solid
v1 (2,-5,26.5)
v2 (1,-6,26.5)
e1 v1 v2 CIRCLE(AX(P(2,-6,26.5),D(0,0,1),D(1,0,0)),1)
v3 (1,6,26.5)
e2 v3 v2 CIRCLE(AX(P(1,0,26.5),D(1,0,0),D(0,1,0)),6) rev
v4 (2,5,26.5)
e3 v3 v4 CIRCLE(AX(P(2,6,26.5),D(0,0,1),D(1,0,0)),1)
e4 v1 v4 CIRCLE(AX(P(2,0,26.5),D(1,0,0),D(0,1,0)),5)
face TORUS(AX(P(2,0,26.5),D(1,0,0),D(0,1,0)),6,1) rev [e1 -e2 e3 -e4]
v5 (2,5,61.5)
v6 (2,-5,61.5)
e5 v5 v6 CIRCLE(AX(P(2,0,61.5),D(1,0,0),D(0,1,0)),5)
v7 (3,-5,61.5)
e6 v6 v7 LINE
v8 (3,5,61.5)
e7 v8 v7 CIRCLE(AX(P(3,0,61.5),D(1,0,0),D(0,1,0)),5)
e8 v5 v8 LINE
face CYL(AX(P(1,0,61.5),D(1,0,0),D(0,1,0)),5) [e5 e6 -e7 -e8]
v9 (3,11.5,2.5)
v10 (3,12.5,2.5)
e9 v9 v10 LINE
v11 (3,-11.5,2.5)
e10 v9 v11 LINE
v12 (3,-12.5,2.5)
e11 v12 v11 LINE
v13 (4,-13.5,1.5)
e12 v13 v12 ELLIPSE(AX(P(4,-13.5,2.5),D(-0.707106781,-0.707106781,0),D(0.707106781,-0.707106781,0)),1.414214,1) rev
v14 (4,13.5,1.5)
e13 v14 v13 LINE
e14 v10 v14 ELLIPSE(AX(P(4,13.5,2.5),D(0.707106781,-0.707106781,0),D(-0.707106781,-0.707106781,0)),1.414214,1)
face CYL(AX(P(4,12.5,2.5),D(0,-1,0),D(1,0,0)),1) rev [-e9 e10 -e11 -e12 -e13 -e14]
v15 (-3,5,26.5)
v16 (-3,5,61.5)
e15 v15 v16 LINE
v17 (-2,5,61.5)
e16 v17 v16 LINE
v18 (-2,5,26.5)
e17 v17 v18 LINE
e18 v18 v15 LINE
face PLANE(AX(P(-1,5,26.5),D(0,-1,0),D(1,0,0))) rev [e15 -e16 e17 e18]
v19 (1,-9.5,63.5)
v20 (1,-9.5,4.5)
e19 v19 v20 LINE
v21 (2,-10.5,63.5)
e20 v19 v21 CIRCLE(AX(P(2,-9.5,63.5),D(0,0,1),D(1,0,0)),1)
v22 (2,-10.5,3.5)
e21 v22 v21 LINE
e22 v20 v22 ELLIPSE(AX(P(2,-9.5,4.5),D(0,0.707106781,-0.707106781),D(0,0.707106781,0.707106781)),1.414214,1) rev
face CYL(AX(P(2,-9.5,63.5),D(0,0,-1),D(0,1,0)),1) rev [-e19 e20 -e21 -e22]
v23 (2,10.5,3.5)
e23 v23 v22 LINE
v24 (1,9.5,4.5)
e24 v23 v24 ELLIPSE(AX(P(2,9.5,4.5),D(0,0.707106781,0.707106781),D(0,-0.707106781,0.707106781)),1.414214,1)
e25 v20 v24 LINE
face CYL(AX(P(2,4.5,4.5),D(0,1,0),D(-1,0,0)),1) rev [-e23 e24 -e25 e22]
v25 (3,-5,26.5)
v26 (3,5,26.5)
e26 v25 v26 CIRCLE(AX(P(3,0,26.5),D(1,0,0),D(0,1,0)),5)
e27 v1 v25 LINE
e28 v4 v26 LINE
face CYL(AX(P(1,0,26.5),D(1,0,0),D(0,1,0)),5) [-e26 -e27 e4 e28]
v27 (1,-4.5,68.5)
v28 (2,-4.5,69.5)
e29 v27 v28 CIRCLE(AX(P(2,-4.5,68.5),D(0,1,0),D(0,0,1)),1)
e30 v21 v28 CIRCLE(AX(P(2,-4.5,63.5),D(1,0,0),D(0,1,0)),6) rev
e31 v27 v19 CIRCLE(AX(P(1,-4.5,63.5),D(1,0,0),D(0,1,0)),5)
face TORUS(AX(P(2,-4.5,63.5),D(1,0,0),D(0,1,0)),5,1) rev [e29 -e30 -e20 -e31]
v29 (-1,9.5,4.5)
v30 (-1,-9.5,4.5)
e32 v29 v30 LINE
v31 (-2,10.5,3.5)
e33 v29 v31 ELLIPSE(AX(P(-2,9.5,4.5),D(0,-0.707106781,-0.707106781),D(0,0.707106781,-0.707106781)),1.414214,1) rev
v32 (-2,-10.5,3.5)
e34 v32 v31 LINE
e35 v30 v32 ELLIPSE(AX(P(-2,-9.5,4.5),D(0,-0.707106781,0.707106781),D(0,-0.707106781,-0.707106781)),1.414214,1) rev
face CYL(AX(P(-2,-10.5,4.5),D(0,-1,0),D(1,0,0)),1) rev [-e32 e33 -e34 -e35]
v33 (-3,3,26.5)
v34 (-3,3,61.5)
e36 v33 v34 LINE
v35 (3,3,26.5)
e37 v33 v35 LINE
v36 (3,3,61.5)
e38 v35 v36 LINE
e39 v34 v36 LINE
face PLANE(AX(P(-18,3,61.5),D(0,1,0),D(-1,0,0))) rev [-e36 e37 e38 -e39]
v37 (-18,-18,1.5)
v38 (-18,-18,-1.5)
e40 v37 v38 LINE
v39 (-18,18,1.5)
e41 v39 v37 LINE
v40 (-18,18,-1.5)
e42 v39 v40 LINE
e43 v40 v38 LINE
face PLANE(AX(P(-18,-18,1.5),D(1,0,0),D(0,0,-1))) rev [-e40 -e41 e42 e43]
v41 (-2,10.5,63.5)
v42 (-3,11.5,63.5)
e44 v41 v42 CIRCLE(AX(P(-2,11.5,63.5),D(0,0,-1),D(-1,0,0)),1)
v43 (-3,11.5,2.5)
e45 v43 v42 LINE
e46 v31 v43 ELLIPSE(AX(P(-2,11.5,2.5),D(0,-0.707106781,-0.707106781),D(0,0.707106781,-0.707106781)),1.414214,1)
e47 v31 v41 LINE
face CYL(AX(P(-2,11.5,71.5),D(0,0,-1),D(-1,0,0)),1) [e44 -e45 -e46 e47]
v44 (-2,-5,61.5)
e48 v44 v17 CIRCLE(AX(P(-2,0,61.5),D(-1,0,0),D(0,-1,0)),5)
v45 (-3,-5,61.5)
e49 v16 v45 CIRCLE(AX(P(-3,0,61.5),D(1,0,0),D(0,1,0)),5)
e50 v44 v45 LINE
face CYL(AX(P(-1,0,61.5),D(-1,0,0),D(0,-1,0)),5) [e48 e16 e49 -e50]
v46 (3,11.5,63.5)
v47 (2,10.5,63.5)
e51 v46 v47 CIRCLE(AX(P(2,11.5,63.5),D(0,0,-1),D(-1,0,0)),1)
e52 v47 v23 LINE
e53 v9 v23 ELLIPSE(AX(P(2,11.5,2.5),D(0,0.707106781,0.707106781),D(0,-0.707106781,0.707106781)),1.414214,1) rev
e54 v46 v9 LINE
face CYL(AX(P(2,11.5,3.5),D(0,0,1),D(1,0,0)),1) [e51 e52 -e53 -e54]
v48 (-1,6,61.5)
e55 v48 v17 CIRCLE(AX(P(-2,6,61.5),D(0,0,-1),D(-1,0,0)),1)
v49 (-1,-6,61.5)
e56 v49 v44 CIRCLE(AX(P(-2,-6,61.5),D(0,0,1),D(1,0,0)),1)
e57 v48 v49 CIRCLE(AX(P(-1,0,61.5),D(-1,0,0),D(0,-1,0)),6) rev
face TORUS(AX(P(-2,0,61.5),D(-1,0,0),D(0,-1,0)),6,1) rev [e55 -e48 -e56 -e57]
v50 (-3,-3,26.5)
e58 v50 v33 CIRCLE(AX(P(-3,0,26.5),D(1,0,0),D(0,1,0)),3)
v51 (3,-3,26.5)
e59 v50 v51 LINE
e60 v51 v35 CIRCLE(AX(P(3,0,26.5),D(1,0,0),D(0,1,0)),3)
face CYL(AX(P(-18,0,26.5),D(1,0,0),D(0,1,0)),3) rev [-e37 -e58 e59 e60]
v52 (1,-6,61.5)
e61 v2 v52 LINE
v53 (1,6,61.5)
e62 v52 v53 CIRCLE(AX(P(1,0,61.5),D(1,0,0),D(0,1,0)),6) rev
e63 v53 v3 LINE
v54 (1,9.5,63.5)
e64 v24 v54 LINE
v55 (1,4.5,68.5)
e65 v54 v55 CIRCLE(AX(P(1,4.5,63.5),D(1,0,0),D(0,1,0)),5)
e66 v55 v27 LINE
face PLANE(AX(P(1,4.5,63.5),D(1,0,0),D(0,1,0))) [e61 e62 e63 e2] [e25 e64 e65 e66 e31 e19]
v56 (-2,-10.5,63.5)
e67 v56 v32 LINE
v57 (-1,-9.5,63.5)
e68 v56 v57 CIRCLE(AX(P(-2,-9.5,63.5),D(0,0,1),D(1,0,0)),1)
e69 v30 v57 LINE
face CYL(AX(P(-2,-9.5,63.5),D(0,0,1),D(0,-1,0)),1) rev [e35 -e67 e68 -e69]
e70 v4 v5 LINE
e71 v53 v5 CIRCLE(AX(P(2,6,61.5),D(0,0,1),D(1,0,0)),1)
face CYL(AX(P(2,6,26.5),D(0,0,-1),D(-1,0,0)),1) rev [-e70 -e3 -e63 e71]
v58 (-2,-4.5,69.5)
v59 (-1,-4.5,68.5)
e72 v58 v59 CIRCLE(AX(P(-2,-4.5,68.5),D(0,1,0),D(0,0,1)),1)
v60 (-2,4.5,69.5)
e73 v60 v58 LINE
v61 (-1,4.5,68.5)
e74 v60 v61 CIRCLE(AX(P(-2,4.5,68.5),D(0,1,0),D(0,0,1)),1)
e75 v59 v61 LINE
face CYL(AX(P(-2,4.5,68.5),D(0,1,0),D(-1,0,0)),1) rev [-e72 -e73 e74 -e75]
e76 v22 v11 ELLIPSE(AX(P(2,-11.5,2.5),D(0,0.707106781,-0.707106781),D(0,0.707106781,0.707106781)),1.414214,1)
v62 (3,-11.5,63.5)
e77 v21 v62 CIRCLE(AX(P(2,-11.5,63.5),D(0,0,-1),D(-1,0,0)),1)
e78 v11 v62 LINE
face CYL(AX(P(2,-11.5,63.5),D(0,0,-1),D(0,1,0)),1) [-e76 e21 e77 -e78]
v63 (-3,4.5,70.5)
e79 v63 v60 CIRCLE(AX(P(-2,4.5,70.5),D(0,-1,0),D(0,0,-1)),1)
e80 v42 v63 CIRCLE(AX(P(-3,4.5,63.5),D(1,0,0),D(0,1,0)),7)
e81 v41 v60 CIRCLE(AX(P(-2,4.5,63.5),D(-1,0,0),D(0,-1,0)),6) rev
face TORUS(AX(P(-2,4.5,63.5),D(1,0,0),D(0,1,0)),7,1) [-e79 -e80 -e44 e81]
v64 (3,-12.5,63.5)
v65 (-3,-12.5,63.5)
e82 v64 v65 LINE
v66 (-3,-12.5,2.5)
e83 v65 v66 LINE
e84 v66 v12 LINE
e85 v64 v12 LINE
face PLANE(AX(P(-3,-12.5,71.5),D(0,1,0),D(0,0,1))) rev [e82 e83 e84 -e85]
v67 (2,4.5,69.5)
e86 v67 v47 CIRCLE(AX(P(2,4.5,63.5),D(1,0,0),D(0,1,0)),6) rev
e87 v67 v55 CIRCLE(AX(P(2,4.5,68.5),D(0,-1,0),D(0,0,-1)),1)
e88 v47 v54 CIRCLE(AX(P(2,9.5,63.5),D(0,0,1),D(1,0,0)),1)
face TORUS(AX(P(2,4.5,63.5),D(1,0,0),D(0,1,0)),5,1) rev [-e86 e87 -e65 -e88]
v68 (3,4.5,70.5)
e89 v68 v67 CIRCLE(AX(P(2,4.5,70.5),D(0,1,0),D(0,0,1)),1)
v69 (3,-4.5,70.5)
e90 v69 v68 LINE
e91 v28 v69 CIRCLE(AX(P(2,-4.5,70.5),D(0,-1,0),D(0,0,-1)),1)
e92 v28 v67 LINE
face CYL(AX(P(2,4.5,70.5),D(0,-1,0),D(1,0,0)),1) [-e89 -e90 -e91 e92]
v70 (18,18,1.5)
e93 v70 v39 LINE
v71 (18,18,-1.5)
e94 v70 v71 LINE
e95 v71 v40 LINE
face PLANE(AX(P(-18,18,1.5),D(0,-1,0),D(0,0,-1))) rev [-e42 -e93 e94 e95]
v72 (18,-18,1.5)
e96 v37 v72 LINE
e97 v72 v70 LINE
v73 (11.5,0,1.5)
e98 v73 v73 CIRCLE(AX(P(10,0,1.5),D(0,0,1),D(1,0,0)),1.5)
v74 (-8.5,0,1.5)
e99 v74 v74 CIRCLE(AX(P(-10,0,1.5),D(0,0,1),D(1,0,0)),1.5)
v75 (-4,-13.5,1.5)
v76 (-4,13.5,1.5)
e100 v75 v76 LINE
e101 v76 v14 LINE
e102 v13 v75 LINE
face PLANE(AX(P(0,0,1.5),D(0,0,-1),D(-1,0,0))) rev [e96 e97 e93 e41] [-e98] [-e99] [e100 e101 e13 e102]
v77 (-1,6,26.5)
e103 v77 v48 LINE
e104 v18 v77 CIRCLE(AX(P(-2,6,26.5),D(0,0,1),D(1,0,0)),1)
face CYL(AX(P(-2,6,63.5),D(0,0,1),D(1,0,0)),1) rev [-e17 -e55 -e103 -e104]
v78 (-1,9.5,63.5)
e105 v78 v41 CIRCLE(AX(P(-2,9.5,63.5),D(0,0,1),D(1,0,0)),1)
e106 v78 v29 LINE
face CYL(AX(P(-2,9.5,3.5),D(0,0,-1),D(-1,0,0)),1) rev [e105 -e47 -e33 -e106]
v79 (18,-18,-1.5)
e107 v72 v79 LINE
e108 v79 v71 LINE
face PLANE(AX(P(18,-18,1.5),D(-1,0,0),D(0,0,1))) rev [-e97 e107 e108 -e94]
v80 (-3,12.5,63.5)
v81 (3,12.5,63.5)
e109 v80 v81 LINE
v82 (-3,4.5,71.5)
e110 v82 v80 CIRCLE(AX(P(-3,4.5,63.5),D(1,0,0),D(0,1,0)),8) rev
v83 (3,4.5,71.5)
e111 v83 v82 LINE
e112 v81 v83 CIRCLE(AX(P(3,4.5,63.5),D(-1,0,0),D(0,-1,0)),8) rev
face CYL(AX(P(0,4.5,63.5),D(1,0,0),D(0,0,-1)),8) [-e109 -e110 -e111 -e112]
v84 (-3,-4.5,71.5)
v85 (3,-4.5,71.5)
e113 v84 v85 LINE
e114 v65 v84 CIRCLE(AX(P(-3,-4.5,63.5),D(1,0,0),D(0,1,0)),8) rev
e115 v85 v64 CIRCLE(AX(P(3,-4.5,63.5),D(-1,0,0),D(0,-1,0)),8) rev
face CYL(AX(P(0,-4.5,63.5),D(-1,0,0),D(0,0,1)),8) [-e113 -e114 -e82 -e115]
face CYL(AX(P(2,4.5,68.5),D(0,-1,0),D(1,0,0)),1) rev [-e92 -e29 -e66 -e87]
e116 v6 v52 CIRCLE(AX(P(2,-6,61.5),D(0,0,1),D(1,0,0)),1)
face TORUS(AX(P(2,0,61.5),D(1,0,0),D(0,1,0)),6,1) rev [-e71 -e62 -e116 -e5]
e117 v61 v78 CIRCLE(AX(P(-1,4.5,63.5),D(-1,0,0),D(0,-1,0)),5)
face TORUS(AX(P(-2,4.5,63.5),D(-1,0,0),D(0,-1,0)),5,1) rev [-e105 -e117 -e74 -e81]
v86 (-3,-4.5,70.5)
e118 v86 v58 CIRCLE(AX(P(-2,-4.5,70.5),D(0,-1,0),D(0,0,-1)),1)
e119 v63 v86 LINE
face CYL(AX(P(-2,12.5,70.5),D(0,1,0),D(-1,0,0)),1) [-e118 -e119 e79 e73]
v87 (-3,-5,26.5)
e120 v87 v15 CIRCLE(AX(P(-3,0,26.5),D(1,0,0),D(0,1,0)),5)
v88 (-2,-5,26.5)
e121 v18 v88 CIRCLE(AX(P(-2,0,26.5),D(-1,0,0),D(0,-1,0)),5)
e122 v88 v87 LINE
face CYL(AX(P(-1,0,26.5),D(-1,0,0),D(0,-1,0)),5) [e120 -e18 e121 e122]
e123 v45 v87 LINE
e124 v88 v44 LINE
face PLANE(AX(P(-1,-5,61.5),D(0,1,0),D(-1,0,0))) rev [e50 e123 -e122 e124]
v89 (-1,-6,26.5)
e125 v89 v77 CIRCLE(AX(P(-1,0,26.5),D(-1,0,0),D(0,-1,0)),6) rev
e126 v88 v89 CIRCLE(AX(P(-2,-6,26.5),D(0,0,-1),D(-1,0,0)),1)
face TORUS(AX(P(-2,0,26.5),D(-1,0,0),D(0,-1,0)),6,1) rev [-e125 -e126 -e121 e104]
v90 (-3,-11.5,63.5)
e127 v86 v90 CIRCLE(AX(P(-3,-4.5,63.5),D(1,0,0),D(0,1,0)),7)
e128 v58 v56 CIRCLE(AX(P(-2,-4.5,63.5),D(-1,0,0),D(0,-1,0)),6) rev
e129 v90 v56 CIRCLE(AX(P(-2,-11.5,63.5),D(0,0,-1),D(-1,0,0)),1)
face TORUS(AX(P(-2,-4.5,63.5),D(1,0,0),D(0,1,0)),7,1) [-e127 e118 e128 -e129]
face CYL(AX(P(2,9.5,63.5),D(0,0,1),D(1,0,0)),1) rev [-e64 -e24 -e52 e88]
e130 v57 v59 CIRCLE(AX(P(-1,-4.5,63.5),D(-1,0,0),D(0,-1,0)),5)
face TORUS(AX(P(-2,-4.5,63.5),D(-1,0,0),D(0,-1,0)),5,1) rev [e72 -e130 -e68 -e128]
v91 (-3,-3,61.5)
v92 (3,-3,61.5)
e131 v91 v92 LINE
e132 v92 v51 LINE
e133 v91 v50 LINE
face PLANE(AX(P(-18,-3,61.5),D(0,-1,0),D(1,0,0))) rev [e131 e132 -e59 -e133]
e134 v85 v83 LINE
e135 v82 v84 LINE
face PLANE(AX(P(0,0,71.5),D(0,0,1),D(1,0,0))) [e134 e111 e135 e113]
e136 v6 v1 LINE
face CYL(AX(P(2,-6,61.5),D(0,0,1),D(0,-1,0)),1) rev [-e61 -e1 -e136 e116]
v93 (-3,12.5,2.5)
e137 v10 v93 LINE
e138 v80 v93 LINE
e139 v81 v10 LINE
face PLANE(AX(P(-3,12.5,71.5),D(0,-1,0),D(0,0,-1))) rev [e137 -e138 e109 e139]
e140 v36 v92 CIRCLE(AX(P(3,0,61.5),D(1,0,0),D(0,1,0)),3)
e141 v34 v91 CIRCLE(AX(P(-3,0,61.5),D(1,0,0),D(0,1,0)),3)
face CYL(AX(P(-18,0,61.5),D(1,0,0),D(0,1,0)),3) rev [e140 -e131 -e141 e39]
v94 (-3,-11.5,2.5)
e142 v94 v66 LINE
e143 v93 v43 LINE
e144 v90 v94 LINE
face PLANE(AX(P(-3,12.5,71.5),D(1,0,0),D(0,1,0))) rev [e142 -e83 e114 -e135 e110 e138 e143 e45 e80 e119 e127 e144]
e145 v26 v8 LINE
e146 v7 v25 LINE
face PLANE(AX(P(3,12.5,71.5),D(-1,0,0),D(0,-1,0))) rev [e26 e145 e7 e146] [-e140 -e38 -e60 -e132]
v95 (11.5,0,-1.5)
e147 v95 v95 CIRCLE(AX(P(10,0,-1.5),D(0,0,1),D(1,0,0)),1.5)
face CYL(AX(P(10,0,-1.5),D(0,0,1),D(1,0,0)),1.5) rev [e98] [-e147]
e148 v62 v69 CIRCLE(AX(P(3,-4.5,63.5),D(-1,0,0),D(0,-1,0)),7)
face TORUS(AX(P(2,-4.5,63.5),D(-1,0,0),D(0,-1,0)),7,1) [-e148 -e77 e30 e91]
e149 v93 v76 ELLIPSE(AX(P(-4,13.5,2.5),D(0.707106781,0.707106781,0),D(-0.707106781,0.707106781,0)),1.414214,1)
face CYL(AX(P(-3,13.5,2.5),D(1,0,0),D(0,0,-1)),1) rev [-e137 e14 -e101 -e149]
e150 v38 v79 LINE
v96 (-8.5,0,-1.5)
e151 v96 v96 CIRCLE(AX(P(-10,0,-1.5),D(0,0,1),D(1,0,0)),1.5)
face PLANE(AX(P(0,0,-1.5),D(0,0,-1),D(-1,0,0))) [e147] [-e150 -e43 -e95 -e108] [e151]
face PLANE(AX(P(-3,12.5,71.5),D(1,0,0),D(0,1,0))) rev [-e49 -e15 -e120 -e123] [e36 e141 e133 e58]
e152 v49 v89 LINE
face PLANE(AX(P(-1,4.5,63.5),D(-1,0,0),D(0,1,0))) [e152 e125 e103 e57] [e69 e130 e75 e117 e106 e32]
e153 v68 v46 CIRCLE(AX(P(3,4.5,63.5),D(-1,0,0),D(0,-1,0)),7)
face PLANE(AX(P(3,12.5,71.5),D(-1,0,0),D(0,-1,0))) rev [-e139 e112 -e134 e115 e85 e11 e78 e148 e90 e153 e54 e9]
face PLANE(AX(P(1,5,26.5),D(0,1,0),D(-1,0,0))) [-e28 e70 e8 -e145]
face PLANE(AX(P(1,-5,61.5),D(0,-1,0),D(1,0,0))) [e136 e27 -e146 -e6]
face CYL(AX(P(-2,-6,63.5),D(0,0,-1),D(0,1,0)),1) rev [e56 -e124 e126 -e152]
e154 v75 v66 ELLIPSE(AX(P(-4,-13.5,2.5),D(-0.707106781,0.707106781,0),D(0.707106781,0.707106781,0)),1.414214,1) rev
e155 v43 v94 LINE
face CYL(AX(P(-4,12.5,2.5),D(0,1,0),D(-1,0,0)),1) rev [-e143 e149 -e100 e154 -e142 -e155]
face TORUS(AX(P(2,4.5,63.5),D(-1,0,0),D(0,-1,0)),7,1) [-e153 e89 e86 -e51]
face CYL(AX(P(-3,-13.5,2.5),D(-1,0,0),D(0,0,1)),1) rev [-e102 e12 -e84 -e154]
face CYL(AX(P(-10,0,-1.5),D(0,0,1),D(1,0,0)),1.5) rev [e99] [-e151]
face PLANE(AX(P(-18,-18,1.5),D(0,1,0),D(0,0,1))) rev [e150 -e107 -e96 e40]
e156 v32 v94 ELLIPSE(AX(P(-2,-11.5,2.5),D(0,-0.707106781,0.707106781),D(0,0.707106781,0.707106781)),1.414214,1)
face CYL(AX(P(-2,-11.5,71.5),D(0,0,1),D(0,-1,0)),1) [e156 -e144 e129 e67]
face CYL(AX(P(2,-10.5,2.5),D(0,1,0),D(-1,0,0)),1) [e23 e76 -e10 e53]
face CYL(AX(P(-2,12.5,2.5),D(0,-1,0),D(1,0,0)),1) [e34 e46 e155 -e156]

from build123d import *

# Parameters (mm, degrees)
SKETCH1_W           = 36
SKETCH1_H           = 36
BOSS_EXTRUDE1_DEPTH = 1.5
SKETCH2_R           = 1.5
CUT_EXTRUDE1_DEPTH  = 26.632011236
SKETCH3_W           = 6
SKETCH3_H           = 25
BOSS_EXTRUDE2_DEPTH = 70
CUT_EXTRUDE2_DEPTH  = 77.66322456
FILLET1_R           = 8
CUT_EXTRUDE3_DEPTH  = 2
FILLET4_R           = 1


with BuildPart() as part:
    # Sketch1 → Boss-Extrude1 (new, symmetric)
    with BuildSketch(Plane.XY):
        Rectangle(SKETCH1_W, SKETCH1_H)
    extrude(amount=BOSS_EXTRUDE1_DEPTH, both=True)

    # Sketch2 → Cut-Extrude1 (cut, through all)
    with BuildSketch(Plane.XY.offset(1.5)):
        with Locations((-10, 0)):
            Circle(SKETCH2_R)
        with Locations((10, 0)):
            Circle(SKETCH2_R)
    extrude(amount=-CUT_EXTRUDE1_DEPTH, mode=Mode.SUBTRACT)

    # Sketch3 → Boss-Extrude2 (add)
    with BuildSketch(Plane.XY.offset(1.5)):
        Rectangle(SKETCH3_W, SKETCH3_H)
    extrude(amount=BOSS_EXTRUDE2_DEPTH)

    # Sketch4 → Cut-Extrude2 (cut, through all)
    with BuildSketch(Plane(origin=(3, 0, 0), x_dir=(0, 0, -1), z_dir=(1, 0, 0))):
        with BuildLine():
            Line((-61.5, 3), (-26.5, 3))
            ThreePointArc((-26.5, 3), (-23.5, 0), (-26.5, -3))
            Line((-26.5, -3), (-61.5, -3))
            ThreePointArc((-61.5, -3), (-64.5, 0), (-61.5, 3))
        make_face()
    extrude(amount=-CUT_EXTRUDE2_DEPTH, mode=Mode.SUBTRACT)

    # Fillet1
    fillet1_edges = [part.edges().sort_by_distance(p)[0] for p in [
        (0, 12.5, 71.5),
        (0, -12.5, 71.5),
    ]]
    fillet(fillet1_edges, radius=FILLET1_R)

    # Sketch5 → Cut-Extrude3 (cut)
    with BuildSketch(Plane(origin=(3, 0, 0), x_dir=(0, 0, -1), z_dir=(1, 0, 0))):
        with BuildLine():
            Line((-3.5, -10.5), (-3.5, 10.5))
            Line((-3.5, 10.5), (-63.5, 10.5))
            ThreePointArc((-63.5, 10.5), (-67.742640687, 8.742640687), (-69.5, 4.5))
            Line((-69.5, 4.5), (-69.5, -4.5))
            ThreePointArc((-69.5, -4.5), (-67.742640687, -8.742640687), (-63.5, -10.5))
            Line((-63.5, -10.5), (-3.5, -10.5))
        make_face()
        with BuildLine():
            Line((-26.5, 5), (-61.5, 5))
            ThreePointArc((-61.5, 5), (-66.5, 0), (-61.5, -5))
            Line((-61.5, -5), (-26.5, -5))
            ThreePointArc((-26.5, -5), (-21.5, 0), (-26.5, 5))
        make_face(mode=Mode.SUBTRACT)
    cut_extrude3 = extrude(amount=-CUT_EXTRUDE3_DEPTH, mode=Mode.SUBTRACT)

    # Mirror1: Cut-Extrude3 across plane
    add(cut_extrude3.mirror(Plane(origin=(0, 0, 0), x_dir=(0, 0, 1), z_dir=(1, 0, 0))), mode=Mode.SUBTRACT)

    # Fillet4
    fillet4_edges = [part.edges().sort_by_distance(p)[0] for p in [
        (-3, -10.5, 33.5),
        (-3, -8.742640687, 67.742640687),
        (-3, 0, 69.5),
        (-3, 8.742640687, 67.742640687),
        (3, 10.5, 33.5),
        (3, 8.742640687, 67.742640687),
        (3, 0, 69.5),
        (3, -8.742640687, 67.742640687),
        (-1, 10.5, 33.5),
        (-1, 8.742640687, 67.742640687),
        (-1, 0, 69.5),
        (-1, -8.742640687, 67.742640687),
        (-1, -5, 44),
        (-1, 0, 66.5),
        (-1, 5, 44),
        (1, 10.5, 33.5),
        (1, 8.742640687, 67.742640687),
        (1, 0, 69.5),
        (1, -8.742640687, 67.742640687),
        (1, 0, 21.5),
        (1, -5, 44),
        (1, 0, 66.5),
        (0, 12.5, 1.5),
        (0, -12.5, 1.5),
        (-3, 0, 1.5),
        (3, 0, 1.5),
        (-3, 10.5, 33.5),
        (-3, 0, 3.5),
        (3, 0, 3.5),
        (3, -10.5, 33.5),
        (-1, 0, 3.5),
        (-1, -10.5, 33.5),
        (-1, 0, 21.5),
        (1, 0, 3.5),
        (1, -10.5, 33.5),
        (1, 5, 44),
    ]]
    fillet(fillet4_edges, radius=FILLET4_R - 0.0001)  # a hair under: the kernel refuses the full size


solid = part.part
